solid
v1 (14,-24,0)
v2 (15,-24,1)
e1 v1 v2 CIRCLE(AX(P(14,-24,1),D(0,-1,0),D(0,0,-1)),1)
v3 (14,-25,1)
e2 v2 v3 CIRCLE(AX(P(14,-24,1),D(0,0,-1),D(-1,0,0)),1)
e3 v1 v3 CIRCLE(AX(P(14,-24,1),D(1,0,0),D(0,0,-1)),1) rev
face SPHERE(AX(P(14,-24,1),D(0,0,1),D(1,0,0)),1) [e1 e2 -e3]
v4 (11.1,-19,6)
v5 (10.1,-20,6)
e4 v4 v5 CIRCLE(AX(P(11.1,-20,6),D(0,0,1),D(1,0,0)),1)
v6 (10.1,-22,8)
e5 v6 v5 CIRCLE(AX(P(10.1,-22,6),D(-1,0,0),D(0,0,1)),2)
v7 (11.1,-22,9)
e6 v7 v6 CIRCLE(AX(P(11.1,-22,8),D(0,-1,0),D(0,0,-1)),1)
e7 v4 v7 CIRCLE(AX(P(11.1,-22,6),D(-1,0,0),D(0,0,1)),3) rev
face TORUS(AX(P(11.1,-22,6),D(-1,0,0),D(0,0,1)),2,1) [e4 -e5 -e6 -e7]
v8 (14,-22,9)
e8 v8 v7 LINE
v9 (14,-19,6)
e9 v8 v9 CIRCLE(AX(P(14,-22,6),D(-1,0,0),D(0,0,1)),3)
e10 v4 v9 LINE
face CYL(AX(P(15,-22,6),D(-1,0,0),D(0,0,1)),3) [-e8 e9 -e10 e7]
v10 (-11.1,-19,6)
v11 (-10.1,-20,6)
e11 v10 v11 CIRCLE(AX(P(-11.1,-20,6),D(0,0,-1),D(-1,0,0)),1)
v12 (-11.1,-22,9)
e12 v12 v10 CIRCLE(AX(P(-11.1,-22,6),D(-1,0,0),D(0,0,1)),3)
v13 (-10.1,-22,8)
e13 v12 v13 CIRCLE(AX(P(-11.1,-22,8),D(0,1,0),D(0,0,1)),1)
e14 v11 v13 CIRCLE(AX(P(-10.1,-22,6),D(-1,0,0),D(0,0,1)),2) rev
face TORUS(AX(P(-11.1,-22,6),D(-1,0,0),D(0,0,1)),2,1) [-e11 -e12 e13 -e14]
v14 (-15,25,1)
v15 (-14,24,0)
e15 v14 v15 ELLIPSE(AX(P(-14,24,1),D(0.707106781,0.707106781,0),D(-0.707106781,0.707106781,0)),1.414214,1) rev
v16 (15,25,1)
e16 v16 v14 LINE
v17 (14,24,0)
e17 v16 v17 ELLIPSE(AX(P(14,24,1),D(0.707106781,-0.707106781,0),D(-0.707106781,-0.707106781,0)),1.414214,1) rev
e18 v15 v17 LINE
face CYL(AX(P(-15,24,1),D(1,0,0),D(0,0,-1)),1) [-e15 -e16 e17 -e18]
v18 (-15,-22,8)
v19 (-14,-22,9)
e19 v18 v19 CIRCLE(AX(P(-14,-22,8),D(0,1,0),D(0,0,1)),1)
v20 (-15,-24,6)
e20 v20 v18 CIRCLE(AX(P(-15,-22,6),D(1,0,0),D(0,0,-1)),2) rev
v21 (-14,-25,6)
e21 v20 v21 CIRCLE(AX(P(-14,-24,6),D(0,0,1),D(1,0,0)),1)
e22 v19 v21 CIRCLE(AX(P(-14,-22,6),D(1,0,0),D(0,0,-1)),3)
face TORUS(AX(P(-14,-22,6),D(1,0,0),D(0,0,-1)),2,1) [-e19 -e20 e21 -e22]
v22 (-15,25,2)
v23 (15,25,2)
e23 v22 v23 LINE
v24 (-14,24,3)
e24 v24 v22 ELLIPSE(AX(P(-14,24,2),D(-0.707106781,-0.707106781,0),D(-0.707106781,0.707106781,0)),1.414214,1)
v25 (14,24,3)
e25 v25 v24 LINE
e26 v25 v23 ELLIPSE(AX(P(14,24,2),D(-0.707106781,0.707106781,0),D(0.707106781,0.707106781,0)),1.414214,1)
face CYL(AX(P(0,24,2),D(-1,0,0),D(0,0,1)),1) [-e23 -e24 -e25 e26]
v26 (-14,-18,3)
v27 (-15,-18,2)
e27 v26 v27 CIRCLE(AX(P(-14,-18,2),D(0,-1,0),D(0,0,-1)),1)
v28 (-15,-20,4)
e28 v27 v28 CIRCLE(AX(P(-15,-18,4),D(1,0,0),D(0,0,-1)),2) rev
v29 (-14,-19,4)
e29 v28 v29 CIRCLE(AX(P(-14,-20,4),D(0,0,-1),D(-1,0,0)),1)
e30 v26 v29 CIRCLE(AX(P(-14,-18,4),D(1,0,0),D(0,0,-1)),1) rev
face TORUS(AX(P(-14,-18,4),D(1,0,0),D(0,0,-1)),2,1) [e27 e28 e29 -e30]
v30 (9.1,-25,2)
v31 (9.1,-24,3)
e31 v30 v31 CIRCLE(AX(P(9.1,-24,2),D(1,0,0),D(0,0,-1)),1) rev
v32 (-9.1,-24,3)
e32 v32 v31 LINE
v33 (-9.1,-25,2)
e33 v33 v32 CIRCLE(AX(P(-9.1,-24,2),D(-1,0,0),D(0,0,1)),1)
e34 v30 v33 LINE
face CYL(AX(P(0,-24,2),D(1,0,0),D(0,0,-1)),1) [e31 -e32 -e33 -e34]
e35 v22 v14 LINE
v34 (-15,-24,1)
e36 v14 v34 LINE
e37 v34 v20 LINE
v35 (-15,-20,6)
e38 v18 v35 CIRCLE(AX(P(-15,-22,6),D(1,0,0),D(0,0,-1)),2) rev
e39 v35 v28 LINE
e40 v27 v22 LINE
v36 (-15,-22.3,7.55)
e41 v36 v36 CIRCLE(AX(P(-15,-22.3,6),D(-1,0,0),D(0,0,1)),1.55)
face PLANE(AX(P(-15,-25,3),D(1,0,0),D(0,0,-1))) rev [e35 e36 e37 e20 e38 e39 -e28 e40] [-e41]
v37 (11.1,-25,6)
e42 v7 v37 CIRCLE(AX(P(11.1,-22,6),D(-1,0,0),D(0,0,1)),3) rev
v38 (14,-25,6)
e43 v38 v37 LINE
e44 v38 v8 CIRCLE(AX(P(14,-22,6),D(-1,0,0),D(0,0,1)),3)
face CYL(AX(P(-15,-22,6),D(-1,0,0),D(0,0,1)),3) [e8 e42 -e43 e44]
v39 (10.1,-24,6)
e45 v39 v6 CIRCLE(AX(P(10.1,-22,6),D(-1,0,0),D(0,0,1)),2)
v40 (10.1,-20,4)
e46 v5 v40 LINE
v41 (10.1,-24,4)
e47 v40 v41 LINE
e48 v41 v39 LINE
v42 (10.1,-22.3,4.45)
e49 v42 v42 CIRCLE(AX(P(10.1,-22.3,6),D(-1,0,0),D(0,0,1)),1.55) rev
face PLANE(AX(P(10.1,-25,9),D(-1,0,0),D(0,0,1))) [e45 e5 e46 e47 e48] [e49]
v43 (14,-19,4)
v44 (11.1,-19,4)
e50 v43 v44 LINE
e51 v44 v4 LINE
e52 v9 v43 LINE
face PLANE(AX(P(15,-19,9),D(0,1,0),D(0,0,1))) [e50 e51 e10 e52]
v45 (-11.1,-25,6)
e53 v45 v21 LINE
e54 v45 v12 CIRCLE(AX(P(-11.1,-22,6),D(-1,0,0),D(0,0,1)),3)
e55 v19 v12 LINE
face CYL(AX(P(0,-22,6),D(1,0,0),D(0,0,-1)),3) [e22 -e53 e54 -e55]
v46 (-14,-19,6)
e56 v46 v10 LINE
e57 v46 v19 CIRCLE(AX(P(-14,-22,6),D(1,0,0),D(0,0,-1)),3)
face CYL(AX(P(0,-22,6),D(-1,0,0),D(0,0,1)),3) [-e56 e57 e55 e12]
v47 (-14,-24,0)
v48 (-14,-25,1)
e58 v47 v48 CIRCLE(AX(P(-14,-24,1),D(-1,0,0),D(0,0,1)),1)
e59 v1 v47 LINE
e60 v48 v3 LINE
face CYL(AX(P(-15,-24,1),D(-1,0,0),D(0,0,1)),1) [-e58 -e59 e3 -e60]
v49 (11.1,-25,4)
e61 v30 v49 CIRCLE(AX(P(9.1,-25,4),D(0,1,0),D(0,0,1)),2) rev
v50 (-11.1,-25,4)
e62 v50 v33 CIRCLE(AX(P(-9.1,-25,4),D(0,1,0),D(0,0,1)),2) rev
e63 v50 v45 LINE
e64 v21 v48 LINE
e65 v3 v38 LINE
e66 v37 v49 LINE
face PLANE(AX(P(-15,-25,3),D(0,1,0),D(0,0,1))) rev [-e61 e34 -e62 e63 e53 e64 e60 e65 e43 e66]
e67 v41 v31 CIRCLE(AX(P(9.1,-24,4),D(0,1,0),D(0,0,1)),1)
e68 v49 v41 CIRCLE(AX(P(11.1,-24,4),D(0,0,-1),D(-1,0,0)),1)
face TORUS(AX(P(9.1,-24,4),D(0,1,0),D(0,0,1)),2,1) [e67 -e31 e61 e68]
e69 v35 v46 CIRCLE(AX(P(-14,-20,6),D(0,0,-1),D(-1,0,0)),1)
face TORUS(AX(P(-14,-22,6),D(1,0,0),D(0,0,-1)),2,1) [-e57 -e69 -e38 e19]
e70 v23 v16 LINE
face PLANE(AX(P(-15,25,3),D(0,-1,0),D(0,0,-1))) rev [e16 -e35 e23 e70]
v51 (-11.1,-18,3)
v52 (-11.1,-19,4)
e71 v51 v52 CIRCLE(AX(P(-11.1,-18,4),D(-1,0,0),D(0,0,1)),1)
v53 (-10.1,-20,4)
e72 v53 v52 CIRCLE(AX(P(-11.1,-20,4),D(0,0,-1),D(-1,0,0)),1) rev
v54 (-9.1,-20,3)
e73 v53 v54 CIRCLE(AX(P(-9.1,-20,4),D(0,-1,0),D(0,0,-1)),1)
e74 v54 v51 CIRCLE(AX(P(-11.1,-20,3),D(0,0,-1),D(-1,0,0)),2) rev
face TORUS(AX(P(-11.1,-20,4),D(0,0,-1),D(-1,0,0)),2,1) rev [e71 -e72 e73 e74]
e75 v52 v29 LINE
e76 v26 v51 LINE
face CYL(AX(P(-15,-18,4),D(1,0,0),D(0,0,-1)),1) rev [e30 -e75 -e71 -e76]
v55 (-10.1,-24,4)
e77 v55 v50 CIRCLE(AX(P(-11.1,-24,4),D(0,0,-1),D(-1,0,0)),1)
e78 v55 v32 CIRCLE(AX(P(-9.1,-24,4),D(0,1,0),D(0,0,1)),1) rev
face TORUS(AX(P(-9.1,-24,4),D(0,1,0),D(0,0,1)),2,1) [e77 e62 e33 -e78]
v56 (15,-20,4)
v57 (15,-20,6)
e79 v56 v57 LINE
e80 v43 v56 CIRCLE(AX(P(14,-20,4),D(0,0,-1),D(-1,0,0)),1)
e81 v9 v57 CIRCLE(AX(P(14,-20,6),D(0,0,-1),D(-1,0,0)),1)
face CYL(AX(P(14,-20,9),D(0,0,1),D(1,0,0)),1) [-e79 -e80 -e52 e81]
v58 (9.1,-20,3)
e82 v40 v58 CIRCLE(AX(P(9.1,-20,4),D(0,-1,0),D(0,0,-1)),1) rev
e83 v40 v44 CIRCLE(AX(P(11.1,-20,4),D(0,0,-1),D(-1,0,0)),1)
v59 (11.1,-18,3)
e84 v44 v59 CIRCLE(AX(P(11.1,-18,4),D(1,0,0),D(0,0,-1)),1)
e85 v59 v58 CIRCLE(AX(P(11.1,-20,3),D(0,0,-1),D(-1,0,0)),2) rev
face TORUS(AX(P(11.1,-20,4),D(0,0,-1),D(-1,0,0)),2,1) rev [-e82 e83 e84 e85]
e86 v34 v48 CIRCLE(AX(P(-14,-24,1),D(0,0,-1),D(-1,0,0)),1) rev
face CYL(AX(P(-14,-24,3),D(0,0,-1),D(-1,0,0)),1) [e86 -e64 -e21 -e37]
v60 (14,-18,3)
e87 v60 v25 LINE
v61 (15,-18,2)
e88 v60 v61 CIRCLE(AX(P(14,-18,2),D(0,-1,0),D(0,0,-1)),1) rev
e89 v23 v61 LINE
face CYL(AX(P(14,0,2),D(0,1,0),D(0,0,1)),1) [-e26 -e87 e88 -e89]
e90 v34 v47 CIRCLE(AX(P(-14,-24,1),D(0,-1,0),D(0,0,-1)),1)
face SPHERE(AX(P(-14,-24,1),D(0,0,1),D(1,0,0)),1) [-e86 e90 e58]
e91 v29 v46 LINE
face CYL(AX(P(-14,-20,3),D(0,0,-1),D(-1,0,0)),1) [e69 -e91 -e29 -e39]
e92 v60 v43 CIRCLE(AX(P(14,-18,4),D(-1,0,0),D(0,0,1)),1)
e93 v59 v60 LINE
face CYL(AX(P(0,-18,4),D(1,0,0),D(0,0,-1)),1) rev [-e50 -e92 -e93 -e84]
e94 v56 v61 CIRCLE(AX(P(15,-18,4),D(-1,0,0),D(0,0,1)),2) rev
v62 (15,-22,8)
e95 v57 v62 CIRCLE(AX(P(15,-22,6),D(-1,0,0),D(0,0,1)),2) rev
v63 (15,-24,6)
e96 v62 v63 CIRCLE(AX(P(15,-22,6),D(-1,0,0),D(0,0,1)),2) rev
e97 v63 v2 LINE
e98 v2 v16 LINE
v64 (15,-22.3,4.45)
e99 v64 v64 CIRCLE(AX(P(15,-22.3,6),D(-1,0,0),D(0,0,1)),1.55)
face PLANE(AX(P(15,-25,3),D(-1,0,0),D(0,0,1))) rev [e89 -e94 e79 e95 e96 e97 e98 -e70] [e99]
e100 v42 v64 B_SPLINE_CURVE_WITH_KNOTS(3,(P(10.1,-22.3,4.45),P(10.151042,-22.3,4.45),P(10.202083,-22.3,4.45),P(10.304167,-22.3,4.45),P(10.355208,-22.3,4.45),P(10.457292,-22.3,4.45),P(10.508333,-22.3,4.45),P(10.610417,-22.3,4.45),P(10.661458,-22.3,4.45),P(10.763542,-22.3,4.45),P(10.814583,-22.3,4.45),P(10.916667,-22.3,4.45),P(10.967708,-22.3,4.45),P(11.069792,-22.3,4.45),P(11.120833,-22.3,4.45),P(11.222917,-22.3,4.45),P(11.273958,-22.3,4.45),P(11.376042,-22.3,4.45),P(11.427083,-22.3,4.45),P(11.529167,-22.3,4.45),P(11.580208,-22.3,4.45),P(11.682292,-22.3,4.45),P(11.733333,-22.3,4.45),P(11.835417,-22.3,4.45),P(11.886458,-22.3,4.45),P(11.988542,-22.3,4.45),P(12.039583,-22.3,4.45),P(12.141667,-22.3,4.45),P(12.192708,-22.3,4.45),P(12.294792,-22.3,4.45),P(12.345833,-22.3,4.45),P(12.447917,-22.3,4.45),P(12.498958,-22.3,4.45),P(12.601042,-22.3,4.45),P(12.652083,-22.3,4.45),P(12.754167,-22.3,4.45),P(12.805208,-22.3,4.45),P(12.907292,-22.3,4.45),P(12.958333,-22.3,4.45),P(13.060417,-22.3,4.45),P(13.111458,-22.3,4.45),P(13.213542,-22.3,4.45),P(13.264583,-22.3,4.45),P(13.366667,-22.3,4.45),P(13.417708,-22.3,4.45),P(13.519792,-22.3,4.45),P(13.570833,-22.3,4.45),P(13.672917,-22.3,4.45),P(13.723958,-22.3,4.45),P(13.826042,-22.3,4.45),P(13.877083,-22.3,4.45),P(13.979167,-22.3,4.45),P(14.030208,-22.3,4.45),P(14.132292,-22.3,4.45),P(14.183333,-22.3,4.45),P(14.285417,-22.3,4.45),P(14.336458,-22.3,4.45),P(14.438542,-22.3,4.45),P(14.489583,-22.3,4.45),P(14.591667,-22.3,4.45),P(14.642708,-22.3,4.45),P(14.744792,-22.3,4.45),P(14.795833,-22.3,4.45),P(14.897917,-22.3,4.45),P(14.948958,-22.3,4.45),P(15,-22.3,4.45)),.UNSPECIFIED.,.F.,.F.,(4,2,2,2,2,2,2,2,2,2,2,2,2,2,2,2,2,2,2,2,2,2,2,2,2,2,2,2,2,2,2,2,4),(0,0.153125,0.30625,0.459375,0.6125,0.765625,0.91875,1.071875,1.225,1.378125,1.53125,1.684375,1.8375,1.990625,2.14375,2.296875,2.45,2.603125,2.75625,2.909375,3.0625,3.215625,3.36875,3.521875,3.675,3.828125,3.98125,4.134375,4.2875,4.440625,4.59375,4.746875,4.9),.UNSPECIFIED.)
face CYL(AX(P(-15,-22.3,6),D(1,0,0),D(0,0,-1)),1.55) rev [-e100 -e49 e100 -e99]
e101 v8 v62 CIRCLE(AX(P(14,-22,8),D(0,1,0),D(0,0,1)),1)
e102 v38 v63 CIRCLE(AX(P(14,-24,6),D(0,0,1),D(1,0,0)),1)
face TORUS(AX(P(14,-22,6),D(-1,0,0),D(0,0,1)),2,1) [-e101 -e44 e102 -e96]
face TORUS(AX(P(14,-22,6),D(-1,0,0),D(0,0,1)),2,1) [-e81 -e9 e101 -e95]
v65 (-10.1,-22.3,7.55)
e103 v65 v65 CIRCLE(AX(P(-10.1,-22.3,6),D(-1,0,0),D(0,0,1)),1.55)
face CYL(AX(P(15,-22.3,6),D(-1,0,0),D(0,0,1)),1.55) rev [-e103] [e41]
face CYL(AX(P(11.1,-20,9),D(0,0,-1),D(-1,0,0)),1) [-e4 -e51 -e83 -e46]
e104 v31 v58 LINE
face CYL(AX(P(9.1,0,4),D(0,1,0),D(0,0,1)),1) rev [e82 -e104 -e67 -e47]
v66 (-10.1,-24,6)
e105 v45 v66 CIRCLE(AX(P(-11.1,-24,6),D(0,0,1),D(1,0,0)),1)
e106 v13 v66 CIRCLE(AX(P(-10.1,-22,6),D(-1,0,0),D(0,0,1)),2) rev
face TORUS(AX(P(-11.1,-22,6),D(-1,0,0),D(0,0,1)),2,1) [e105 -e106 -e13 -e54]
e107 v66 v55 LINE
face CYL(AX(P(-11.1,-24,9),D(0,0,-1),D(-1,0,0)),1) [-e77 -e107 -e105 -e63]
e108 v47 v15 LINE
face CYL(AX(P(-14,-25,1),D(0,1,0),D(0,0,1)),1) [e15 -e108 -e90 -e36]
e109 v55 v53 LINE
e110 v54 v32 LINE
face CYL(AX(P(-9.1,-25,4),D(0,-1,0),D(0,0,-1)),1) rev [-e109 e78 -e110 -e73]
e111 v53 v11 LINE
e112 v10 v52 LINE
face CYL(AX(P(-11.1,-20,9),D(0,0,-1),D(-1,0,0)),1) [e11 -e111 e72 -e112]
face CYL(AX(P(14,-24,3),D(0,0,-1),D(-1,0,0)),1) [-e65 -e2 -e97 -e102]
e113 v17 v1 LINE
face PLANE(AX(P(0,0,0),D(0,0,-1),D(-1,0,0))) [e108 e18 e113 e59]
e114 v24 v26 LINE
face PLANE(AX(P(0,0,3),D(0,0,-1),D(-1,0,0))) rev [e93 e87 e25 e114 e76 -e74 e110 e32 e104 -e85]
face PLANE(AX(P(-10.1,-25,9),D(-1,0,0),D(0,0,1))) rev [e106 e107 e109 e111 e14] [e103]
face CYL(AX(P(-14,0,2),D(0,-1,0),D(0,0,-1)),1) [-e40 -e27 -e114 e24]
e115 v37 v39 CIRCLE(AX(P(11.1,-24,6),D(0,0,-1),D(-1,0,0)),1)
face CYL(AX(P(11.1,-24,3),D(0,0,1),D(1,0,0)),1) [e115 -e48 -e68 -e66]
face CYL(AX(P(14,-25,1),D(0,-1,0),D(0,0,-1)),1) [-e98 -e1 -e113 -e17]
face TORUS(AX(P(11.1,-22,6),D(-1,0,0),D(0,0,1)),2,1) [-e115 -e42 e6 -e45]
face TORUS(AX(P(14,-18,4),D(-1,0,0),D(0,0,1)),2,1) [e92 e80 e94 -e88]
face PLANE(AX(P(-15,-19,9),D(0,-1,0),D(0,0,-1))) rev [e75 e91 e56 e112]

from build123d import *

# Parameters (mm, degrees)
SKETCH1_W           = 30
SKETCH1_H           = 50
BOSS_EXTRUDE1_DEPTH = 3
SKETCH2_W           = 4.9
SKETCH2_H           = 6
BOSS_EXTRUDE2_DEPTH = 6
SKETCH3_R           = 1.55
CUT_EXTRUDE1_DEPTH  = 41.074929819
FILLET1_R           = 3
FILLET2_R           = 1


with BuildPart() as part:
    # Sketch1 → Boss-Extrude1 (new body)
    with BuildSketch(Plane.XY):
        Rectangle(SKETCH1_W, SKETCH1_H)
    extrude(amount=BOSS_EXTRUDE1_DEPTH)

    # Sketch2 → Boss-Extrude2 (add)
    with BuildSketch(Plane.XY.offset(3)):
        with Locations((-12.55, -22)):
            Rectangle(SKETCH2_W, SKETCH2_H)
    boss_extrude2 = extrude(amount=BOSS_EXTRUDE2_DEPTH)

    # Sketch3 → Cut-Extrude1 (cut, through all)
    with BuildSketch(Plane.ZY.offset(15)):
        with Locations((6, -22.3)):
            Circle(SKETCH3_R)
    cut_extrude1 = extrude(amount=-CUT_EXTRUDE1_DEPTH, mode=Mode.SUBTRACT)

    # Mirror1: Boss-Extrude2, Cut-Extrude1 across plane
    add(boss_extrude2.mirror(Plane(origin=(0, 0, 0), x_dir=(0, 0, 1), z_dir=(1, 0, 0))))
    add(cut_extrude1.mirror(Plane(origin=(0, 0, 0), x_dir=(0, 0, 1), z_dir=(1, 0, 0))), mode=Mode.SUBTRACT)

    # Fillet1
    fillet1_edges = [part.edges().sort_by_distance(p)[0] for p in [
        (12.55, -19, 9),
        (12.55, -25, 9),
        (-12.55, -19, 9),
        (-12.55, -25, 9),
    ]]
    fillet(fillet1_edges, radius=FILLET1_R - 0.0001)  # a hair under: the kernel refuses the full size

    # Fillet2
    fillet2_edges = [part.edges().sort_by_distance(p)[0] for p in [
        (-15, 3, 3),
        (0, -25, 3),
        (-10.1, -22, 3),
        (-12.55, -19, 3),
        (15, 3, 3),
        (10.1, -22, 3),
        (12.55, -19, 3),
        (0, -25, 0),
        (15, -25, 3.00005),
        (10.1, -25, 4.50005),
        (-10.1, -25, 4.50005),
        (-15, -25, 3.00005),
        (10.1, -19, 4.50005),
        (-15, 0, 0),
        (10.1, -19.878650367, 8.121349633),
        (10.1, -24.121349633, 8.121349633),
        (15, -19, 4.50005),
        (15, -19.878650367, 8.121349633),
        (15, -24.121349633, 8.121349633),
        (-15, -19, 4.50005),
        (-15, -24.121349633, 8.121349633),
        (0, 25, 0),
        (-15, -19.878650367, 8.121349633),
        (-10.1, -19, 4.50005),
        (-10.1, -24.121349633, 8.121349633),
        (-10.1, -19.878650367, 8.121349633),
        (15, 0, 0),
        (0, 25, 3),
    ]]
    fillet(fillet2_edges, radius=FILLET2_R)


solid = part.part
